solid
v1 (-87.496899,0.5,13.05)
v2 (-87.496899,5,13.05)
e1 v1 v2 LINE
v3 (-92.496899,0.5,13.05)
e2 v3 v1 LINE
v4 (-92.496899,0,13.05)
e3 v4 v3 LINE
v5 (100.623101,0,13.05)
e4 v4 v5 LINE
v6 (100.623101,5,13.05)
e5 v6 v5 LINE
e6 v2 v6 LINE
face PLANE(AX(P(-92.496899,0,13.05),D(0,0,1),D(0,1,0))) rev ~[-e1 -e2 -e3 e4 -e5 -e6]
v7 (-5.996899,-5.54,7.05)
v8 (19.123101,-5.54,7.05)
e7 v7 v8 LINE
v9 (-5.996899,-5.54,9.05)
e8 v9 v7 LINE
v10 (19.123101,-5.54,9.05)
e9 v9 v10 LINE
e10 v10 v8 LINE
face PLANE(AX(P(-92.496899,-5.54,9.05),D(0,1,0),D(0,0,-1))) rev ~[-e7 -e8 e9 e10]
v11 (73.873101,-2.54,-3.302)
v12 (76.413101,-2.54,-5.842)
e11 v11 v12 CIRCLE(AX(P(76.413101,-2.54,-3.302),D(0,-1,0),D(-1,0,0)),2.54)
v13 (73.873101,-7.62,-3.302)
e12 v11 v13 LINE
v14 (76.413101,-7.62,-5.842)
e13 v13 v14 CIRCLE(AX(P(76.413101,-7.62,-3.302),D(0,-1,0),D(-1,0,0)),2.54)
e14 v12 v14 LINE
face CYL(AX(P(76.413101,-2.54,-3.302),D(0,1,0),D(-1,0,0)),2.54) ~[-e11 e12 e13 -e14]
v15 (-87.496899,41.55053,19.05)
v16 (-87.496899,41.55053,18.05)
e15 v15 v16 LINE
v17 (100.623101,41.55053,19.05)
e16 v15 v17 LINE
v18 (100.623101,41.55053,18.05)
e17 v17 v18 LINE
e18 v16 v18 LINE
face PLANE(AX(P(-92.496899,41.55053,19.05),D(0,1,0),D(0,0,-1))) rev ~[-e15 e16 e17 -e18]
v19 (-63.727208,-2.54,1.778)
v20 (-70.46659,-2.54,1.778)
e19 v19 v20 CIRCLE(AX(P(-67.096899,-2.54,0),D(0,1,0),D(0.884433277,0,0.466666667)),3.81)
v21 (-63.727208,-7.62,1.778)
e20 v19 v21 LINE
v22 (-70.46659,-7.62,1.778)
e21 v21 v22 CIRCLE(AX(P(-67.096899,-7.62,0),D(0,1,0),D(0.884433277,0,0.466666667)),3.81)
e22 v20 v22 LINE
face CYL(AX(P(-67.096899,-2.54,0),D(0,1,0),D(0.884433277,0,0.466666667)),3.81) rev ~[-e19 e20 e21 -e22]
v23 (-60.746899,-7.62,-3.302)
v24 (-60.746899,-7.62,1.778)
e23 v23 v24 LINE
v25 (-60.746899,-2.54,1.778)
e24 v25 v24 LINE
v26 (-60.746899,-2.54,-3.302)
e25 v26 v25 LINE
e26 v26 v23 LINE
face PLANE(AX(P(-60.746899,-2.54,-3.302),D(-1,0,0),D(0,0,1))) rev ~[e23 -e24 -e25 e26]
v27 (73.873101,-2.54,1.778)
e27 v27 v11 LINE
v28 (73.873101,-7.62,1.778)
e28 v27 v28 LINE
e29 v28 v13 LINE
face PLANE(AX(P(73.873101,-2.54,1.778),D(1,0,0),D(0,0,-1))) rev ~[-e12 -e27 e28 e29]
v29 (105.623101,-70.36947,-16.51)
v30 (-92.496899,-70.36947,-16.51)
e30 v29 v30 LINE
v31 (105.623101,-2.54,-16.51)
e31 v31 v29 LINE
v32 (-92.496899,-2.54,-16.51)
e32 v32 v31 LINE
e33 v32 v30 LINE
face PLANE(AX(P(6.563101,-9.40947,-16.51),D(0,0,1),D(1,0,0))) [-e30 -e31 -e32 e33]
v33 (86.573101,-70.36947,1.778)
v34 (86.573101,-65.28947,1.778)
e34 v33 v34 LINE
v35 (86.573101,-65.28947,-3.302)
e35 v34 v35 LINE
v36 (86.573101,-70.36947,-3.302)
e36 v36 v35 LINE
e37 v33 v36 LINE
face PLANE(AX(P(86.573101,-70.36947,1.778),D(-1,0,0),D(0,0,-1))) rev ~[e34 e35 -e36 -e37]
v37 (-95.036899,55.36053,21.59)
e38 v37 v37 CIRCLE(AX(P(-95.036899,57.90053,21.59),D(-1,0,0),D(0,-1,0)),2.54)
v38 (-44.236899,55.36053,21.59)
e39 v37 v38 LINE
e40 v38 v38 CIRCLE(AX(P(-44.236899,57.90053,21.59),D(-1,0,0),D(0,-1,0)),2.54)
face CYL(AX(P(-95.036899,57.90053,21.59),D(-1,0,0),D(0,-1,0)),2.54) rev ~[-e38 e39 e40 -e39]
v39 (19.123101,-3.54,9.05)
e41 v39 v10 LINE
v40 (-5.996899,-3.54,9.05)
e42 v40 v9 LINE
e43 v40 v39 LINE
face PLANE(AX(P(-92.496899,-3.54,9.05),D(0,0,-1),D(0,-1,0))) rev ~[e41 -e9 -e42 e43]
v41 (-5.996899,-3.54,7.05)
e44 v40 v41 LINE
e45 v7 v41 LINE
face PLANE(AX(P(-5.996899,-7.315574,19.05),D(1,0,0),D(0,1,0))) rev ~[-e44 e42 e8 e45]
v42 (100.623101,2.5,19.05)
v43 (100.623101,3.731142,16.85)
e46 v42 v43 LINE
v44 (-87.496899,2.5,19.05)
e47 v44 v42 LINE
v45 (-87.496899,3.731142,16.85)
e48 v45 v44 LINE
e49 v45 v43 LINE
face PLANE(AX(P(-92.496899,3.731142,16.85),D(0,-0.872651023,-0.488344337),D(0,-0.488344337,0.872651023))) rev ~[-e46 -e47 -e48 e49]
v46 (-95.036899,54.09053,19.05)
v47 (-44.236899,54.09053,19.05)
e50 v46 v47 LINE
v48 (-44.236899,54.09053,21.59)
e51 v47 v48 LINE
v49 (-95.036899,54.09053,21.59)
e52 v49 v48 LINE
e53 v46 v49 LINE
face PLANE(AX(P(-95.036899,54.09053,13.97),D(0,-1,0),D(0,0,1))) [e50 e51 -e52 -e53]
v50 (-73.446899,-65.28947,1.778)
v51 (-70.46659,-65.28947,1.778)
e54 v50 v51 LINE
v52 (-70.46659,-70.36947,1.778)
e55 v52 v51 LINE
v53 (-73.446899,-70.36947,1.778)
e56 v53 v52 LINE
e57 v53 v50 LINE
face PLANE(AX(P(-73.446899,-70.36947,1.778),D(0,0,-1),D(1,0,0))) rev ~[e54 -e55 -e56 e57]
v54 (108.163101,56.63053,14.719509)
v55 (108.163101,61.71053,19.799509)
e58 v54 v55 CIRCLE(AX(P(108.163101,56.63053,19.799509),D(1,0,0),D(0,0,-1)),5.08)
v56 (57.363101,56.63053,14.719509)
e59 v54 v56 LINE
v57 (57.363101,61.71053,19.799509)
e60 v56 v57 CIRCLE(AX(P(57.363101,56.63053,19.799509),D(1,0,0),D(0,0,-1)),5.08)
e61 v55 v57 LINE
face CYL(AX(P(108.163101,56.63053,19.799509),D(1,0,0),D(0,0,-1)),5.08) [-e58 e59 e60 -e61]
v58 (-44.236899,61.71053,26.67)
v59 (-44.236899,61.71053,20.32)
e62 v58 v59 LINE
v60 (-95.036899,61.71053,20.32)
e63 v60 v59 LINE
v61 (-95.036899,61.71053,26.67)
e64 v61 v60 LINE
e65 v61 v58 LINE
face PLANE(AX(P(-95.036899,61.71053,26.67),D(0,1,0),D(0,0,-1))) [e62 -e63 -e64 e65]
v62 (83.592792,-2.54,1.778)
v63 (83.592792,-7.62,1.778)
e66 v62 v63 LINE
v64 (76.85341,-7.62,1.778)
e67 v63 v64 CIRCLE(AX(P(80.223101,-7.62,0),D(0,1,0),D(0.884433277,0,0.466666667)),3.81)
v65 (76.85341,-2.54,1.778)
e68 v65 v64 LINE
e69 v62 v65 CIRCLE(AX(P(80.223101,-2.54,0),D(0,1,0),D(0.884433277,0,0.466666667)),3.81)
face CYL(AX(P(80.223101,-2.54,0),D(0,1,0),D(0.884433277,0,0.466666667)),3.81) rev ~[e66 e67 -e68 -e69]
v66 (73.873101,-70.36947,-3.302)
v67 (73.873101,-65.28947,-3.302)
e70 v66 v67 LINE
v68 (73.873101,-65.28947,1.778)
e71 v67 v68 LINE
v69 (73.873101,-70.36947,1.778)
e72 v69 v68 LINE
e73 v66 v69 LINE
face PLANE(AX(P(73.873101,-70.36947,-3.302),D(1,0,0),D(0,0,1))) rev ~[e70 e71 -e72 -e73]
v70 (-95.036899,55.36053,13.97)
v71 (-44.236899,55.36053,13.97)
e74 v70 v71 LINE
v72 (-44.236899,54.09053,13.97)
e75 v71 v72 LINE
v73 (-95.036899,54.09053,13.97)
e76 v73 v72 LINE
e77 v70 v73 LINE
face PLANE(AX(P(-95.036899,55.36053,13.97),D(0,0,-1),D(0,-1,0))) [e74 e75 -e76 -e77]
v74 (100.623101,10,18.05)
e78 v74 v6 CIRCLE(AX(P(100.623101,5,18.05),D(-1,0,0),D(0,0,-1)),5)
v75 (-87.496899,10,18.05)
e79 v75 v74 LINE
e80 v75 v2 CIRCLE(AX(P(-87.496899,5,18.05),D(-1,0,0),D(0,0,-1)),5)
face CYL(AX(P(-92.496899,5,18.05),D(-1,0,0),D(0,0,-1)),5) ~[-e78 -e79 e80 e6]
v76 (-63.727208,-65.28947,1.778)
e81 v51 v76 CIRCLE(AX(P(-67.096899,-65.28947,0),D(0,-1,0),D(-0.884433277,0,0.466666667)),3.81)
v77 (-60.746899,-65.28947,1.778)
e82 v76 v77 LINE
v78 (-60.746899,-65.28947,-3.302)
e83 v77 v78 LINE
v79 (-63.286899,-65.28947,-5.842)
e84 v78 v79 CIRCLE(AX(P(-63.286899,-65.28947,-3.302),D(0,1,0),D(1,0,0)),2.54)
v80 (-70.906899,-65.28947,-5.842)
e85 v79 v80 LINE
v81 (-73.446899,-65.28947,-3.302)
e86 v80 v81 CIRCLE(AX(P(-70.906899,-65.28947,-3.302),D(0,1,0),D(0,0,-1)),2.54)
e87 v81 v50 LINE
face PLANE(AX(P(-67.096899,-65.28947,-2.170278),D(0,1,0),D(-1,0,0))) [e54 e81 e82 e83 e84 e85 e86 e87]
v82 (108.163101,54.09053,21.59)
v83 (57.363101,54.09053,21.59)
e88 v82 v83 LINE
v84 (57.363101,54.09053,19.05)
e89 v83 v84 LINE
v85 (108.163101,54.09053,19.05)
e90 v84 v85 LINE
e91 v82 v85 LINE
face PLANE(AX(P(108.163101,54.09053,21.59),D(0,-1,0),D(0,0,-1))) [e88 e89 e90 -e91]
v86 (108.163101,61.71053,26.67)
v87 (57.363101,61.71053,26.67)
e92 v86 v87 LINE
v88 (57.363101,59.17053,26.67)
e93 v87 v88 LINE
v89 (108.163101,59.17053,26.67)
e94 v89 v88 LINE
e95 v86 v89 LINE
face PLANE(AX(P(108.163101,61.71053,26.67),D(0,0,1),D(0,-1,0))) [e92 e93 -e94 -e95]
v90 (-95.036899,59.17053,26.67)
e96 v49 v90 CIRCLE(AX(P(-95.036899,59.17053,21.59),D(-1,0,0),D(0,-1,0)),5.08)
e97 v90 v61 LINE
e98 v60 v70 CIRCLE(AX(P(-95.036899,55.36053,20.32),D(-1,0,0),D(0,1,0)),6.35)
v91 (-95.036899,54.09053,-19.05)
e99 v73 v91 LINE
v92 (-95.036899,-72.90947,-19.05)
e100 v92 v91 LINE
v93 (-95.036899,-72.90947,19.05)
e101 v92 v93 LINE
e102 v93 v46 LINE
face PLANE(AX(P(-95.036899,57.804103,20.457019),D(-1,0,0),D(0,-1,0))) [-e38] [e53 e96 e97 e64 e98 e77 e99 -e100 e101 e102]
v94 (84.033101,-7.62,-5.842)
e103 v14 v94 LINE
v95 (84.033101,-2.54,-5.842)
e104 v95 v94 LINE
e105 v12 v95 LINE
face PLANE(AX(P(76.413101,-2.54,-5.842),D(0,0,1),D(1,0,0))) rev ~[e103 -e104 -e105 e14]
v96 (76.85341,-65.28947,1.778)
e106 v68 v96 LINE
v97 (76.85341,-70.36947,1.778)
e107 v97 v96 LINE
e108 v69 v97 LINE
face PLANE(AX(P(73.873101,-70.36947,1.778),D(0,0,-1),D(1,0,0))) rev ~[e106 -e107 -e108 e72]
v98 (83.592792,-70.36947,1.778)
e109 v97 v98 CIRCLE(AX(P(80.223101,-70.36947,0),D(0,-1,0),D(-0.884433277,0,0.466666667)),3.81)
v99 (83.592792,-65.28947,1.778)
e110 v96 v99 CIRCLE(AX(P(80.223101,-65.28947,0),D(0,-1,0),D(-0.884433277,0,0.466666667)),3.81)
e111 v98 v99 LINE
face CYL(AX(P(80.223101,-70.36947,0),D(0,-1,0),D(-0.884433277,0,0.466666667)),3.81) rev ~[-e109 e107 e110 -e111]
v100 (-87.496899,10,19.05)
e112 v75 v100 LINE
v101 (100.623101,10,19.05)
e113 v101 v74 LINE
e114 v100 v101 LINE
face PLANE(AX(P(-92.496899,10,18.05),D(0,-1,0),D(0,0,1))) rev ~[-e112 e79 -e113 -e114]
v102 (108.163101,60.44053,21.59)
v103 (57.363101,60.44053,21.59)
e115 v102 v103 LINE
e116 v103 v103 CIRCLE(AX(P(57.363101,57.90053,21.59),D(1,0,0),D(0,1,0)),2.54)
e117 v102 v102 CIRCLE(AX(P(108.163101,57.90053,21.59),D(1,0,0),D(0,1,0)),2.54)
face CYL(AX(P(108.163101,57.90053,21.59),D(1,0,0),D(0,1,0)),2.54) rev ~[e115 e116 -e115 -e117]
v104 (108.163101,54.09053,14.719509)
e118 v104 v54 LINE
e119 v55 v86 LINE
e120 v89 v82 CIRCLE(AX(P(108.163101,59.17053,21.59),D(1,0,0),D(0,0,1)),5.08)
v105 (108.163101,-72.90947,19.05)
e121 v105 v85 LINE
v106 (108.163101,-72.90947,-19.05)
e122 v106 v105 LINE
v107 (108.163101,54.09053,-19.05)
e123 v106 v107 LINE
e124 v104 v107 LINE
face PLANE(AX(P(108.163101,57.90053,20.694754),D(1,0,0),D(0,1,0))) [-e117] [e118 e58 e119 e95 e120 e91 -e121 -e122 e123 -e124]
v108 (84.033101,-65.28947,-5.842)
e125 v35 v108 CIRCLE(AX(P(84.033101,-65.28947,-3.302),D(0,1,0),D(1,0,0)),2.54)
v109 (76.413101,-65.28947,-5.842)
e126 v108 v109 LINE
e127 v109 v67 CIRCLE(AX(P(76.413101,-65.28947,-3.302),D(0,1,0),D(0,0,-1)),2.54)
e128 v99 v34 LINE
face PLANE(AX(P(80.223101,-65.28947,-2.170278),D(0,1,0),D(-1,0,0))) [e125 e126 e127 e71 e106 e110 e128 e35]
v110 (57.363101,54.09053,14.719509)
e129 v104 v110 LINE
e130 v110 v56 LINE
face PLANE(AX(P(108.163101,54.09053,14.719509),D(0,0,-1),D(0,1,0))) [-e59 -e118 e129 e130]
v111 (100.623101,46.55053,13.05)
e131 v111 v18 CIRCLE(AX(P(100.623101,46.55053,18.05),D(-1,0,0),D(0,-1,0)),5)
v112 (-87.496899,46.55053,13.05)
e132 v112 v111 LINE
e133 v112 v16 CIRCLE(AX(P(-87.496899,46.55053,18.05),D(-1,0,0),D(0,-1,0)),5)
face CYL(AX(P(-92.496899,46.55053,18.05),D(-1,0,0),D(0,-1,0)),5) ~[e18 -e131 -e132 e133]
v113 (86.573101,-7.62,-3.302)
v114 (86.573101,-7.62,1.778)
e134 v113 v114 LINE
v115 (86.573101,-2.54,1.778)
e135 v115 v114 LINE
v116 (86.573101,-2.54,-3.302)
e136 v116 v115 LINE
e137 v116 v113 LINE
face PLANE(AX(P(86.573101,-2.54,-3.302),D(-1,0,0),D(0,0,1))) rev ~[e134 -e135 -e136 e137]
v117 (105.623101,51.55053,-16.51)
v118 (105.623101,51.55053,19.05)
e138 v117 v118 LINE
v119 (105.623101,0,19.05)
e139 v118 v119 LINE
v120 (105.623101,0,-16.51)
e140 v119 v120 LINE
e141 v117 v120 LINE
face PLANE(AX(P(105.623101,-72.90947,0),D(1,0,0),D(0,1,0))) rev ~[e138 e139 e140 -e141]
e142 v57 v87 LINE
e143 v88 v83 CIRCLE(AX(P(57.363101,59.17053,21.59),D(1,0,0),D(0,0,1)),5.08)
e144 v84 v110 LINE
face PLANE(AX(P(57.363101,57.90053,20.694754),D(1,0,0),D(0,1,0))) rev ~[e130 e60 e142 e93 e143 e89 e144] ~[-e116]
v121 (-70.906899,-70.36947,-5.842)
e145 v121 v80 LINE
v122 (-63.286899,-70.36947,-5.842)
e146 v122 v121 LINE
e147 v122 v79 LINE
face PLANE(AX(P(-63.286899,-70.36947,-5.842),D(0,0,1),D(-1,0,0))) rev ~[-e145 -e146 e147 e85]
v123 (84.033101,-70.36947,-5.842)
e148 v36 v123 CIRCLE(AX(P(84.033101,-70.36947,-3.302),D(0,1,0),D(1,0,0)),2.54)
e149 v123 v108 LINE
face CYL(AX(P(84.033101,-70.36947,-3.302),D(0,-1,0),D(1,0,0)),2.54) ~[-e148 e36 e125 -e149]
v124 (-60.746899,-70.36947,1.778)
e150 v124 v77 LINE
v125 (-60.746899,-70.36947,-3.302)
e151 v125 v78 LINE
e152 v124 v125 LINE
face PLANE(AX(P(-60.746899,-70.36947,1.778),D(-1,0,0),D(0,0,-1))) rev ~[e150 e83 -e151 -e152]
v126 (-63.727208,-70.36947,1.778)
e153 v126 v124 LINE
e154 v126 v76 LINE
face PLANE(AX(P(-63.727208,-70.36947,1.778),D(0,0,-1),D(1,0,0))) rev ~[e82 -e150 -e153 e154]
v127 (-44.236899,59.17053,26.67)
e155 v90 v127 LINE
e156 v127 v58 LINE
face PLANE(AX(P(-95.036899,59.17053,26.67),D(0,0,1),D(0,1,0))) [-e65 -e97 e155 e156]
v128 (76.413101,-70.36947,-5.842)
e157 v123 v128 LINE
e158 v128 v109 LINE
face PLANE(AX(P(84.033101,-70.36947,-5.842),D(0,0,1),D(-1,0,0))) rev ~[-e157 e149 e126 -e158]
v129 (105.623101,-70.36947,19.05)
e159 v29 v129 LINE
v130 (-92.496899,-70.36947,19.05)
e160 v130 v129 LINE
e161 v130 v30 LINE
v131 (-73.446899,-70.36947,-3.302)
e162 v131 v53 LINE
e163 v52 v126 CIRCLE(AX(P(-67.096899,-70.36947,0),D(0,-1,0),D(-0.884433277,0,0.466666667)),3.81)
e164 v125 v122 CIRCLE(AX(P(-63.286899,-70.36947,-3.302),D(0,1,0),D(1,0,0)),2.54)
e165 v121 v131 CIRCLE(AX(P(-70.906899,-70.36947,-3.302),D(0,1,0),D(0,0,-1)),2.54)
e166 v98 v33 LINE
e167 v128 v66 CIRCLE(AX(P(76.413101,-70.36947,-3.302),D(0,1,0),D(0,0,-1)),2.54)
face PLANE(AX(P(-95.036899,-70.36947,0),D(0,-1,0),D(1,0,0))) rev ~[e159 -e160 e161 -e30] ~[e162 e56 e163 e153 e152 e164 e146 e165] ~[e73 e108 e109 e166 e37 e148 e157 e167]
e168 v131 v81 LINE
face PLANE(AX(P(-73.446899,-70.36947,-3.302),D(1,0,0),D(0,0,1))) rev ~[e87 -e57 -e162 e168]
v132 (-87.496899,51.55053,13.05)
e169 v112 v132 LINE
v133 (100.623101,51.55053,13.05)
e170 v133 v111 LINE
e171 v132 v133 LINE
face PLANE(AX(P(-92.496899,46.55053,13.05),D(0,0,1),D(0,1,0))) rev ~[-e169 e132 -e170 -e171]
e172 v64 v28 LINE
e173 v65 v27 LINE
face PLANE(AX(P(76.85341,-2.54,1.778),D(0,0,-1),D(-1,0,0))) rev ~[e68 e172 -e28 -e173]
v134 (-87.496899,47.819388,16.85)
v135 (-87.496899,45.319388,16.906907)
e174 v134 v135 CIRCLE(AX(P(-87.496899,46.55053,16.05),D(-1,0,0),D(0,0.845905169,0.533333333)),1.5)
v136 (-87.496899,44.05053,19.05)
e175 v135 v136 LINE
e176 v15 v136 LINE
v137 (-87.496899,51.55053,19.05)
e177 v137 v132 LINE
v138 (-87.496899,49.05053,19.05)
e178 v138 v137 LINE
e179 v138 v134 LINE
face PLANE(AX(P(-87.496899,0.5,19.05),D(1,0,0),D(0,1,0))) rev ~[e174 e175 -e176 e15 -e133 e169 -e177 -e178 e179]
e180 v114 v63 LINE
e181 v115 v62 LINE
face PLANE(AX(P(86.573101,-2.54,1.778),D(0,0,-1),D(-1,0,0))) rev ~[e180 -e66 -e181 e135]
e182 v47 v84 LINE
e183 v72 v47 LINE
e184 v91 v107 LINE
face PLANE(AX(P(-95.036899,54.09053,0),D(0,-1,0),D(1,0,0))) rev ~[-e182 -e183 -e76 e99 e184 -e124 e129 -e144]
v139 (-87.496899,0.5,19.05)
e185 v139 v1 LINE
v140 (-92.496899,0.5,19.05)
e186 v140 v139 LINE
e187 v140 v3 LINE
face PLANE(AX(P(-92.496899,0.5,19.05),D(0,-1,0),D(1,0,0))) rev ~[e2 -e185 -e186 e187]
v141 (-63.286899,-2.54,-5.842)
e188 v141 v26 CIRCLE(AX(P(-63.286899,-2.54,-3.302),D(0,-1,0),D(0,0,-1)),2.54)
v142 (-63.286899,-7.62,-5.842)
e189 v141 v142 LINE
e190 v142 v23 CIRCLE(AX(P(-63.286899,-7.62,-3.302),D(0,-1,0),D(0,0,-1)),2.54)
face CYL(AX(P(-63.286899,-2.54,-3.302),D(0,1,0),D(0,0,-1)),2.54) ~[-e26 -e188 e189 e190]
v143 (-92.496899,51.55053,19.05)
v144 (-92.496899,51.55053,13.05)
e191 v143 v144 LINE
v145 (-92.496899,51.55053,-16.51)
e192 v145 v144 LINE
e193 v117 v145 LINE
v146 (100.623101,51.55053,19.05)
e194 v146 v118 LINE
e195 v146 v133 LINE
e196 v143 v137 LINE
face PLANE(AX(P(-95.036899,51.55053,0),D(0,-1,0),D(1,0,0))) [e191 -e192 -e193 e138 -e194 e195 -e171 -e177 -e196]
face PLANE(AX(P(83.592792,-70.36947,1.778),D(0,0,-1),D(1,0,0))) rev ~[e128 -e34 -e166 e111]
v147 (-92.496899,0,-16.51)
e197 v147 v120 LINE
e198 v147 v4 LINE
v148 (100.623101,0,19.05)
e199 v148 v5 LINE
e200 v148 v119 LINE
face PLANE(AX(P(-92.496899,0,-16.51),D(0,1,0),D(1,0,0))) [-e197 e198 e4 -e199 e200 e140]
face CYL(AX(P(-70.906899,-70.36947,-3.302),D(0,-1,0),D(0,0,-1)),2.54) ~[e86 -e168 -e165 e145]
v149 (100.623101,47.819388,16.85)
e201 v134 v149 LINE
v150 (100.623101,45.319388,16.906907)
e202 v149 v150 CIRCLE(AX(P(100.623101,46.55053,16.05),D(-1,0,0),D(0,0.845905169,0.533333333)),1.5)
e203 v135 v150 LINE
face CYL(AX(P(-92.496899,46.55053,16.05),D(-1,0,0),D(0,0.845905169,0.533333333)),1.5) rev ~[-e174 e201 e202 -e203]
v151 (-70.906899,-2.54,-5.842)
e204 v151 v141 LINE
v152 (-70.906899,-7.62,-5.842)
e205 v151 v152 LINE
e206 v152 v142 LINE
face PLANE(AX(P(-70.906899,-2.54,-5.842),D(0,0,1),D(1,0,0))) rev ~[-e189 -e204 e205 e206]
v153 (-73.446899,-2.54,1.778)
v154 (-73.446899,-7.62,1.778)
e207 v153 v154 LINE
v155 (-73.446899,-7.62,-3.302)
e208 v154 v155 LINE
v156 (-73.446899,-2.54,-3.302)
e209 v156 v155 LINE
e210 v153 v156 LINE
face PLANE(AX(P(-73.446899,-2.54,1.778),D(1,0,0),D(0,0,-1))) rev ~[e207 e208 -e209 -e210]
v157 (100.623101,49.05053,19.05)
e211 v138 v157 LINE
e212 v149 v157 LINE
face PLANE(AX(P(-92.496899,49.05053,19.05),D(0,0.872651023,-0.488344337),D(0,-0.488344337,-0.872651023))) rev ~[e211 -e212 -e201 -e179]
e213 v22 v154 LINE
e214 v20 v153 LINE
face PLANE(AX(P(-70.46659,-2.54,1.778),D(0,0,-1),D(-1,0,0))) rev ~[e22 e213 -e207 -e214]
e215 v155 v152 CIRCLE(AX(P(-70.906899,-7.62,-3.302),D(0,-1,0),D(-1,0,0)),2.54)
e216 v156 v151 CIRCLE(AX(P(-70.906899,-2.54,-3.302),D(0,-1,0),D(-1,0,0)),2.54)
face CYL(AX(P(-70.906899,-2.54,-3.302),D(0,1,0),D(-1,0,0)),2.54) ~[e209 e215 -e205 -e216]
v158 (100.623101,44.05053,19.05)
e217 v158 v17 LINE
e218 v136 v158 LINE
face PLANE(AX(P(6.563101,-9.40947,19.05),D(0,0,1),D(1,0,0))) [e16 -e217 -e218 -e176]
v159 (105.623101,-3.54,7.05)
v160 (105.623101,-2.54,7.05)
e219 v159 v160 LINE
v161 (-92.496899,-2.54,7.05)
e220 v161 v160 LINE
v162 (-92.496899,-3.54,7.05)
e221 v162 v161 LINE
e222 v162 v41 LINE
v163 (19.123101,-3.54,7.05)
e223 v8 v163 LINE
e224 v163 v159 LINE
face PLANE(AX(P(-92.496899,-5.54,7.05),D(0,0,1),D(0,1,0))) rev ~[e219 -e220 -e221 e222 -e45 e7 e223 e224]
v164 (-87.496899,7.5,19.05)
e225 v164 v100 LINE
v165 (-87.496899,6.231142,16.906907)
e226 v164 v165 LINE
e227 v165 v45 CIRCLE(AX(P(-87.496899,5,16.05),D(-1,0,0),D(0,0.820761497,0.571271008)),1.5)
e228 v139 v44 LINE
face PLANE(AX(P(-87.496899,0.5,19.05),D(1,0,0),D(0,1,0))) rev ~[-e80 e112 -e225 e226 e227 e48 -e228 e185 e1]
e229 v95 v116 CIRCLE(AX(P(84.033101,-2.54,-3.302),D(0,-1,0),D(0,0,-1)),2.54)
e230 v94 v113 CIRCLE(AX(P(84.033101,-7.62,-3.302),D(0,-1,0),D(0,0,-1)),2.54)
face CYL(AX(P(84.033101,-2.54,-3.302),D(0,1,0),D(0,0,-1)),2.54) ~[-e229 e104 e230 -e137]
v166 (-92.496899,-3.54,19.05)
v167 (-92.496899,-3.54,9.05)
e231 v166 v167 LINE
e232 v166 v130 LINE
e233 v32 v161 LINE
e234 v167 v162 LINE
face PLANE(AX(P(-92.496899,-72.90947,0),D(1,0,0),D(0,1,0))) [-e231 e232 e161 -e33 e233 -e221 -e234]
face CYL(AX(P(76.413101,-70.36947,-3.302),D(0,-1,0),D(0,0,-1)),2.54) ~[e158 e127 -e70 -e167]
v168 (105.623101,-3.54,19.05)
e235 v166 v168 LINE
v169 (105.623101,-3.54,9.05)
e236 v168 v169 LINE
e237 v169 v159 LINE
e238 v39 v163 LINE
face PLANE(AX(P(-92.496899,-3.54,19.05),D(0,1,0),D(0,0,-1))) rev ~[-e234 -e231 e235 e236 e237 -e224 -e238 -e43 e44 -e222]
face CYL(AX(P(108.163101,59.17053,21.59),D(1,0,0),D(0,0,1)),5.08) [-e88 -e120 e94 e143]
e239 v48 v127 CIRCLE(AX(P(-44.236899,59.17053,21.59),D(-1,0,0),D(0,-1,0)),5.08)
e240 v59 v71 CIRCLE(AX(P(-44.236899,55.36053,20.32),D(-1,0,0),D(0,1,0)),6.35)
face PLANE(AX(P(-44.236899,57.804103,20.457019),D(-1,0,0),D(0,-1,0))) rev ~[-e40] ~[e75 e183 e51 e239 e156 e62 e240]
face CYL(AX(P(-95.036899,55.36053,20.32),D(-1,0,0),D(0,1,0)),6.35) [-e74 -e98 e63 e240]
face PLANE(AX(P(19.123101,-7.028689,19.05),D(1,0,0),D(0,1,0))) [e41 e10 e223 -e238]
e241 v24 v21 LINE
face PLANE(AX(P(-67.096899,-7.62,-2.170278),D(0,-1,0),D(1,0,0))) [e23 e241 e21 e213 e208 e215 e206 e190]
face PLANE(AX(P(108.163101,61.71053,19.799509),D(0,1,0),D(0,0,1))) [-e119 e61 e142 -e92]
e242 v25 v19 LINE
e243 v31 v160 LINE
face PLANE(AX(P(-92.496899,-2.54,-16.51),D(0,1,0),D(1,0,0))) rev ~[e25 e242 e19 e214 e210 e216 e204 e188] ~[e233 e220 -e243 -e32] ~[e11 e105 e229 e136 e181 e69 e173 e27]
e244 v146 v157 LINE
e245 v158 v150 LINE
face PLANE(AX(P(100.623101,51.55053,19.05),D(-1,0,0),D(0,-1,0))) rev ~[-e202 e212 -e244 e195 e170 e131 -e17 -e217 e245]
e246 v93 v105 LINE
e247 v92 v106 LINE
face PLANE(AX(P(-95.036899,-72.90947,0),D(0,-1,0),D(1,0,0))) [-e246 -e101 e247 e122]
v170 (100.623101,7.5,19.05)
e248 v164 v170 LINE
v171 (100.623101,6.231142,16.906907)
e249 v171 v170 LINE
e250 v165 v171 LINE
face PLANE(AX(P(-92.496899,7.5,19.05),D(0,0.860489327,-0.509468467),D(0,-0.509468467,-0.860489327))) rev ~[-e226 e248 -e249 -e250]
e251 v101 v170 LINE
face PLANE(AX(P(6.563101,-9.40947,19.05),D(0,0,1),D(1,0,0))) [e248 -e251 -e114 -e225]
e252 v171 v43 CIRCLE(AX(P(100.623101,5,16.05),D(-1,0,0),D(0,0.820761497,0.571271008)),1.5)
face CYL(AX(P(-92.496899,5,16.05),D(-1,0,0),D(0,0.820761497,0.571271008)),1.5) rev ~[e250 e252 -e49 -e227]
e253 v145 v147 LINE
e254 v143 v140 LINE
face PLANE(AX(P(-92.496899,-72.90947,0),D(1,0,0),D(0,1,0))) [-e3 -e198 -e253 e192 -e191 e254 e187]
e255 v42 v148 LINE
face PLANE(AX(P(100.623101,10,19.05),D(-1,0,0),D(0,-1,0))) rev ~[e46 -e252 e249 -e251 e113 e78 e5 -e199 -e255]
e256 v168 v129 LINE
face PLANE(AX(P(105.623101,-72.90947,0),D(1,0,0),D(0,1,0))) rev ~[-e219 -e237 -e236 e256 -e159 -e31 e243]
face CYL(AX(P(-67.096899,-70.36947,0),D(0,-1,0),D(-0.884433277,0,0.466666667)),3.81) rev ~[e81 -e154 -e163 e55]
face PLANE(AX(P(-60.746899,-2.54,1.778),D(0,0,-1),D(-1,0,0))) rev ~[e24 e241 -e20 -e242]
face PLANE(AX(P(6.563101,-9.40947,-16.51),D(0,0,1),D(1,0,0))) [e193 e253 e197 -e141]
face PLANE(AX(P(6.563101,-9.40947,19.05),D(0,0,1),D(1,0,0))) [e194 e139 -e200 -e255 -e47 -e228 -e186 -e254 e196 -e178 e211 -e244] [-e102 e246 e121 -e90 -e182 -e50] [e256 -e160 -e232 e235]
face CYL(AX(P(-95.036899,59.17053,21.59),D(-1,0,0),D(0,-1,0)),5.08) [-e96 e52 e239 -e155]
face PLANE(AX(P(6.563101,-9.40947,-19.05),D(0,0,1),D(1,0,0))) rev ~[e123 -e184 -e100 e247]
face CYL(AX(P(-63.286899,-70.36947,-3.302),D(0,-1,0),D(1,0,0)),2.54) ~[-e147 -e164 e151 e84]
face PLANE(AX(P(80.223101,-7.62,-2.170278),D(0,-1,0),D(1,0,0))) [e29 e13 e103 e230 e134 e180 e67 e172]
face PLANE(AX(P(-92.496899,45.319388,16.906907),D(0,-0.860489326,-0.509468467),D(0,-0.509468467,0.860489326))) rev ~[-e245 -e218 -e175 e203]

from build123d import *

# Parameters (mm, degrees)
F0_W      = 203.2
F0_H      = 127
F1_DEPTH  = 19.05
F2_T      = -2.54
F3_W      = 198.12
F3_H      = 2.54
F4_DEPTH  = 35.56
F6_DEPTH  = 5.08
F8_DEPTH  = 5.08
F9_R      = 2.54
F10_DEPTH = 50.8
F11_R     = 2.54
F12_DEPTH = 50.8
F14_DEPTH = 198.12
F15_W     = 5
F15_H     = 51.0505303715
F16_DEPTH = 10
F15_H_2   = 2.5
F15_H_3   = 5
F17_DEPTH = 25
F18_W     = 5
F18_H     = 2.5
F18_H_2   = 5
F19_DEPTH = 15
F21_DEPTH = 198.12
F22_W     = 86.5
F22_H     = 3.7755742139
F22_H_2   = 3.4886886767
F23_DEPTH = 15


with BuildPart() as f1:
    # F0 (on Top) → F1 (new body, symmetric)
    with BuildSketch(Plane.XY):
        with Locations((6.5631009638, -9.4094696285)):
            Rectangle(F0_W, F0_H)
    extrude(amount=F1_DEPTH, both=True)

    # F2
    f2_openings = [f1.faces().sort_by_distance(p)[0] for p in [
        (6.563101, -9.40947, 19.05),
    ]]
    offset(amount=F2_T, openings=f2_openings)

    # F3 (on face) → F4 (join, through all)
    with BuildSketch(Plane.XY.offset(-16.51)):
        with Locations((6.5631009638, -1.27)):
            Rectangle(F3_W, F3_H)
    extrude(amount=F4_DEPTH)

    # F5 (on face) → F6 (join)
    with BuildSketch(Plane.XZ.offset(2.54)):
        with BuildLine():
            ThreePointArc((-63.2868990362, -5.842), (-61.490847812, -5.0980512242), (-60.7468990362, -3.302))
            Line((-60.7468990362, -3.302), (-60.7468990362, 1.778))
            Line((-60.7468990362, 1.778), (-63.7272082492, 1.778))
            ThreePointArc((-63.7272082492, 1.778), (-67.0968990362, -3.81), (-70.4665898232, 1.778))
            Line((-70.4665898232, 1.778), (-73.4468990362, 1.778))
            Line((-73.4468990362, 1.778), (-73.4468990362, -3.302))
            ThreePointArc((-73.4468990362, -3.302), (-72.7029502604, -5.0980512242), (-70.9068990362, -5.842))
            Line((-70.9068990362, -5.842), (-63.2868990362, -5.842))
        make_face()
        with BuildLine():
            ThreePointArc((83.5927917508, 1.778), (80.2231009638, -3.81), (76.8534101768, 1.778))
            Line((76.8534101768, 1.778), (73.8731009638, 1.778))
            Line((73.8731009638, 1.778), (73.8731009638, -3.302))
            ThreePointArc((73.8731009638, -3.302), (74.6170497396, -5.0980512242), (76.4131009638, -5.842))
            Line((76.4131009638, -5.842), (84.0331009638, -5.842))
            ThreePointArc((84.0331009638, -5.842), (85.829152188, -5.0980512242), (86.5731009638, -3.302))
            Line((86.5731009638, -3.302), (86.5731009638, 1.778))
            Line((86.5731009638, 1.778), (83.5927917508, 1.778))
        make_face()
    extrude(amount=F6_DEPTH)

    # F7 (on face) → F8 (join)
    with BuildSketch(Plane(origin=(0, -70.3694696285, 0), x_dir=(-1, 0, 0), z_dir=(0, 1, 0))):
        with BuildLine():
            ThreePointArc((-76.8534101768, 1.778), (-80.2231009638, -3.81), (-83.5927917508, 1.778))
            Line((-83.5927917508, 1.778), (-86.5731009638, 1.778))
            Line((-86.5731009638, 1.778), (-86.5731009638, -3.302))
            ThreePointArc((-86.5731009638, -3.302), (-85.829152188, -5.0980512242), (-84.0331009638, -5.842))
            Line((-84.0331009638, -5.842), (-76.4131009638, -5.842))
            ThreePointArc((-76.4131009638, -5.842), (-74.6170497396, -5.0980512242), (-73.8731009638, -3.302))
            Line((-73.8731009638, -3.302), (-73.8731009638, 1.778))
            Line((-73.8731009638, 1.778), (-76.8534101768, 1.778))
        make_face()
        with BuildLine():
            ThreePointArc((60.7468990362, -3.302), (61.490847812, -5.0980512242), (63.2868990362, -5.842))
            Line((63.2868990362, -5.842), (70.9068990362, -5.842))
            ThreePointArc((70.9068990362, -5.842), (72.7029502604, -5.0980512242), (73.4468990362, -3.302))
            Line((73.4468990362, -3.302), (73.4468990362, 1.778))
            Line((73.4468990362, 1.778), (70.4665898232, 1.778))
            ThreePointArc((70.4665898232, 1.778), (67.0968990362, -3.81), (63.7272082492, 1.778))
            Line((63.7272082492, 1.778), (60.7468990362, 1.778))
            Line((60.7468990362, 1.778), (60.7468990362, -3.302))
        make_face()
    extrude(amount=F8_DEPTH)

    # F9 (on face) → F10 (join)
    with BuildSketch(Plane.YZ.offset(108.1631009638)):
        with BuildLine():
            Line((54.0905303715, 21.59), (54.0905303715, 14.7195085883))
            Line((54.0905303715, 14.7195085883), (56.6305303715, 14.7195085883))
            ThreePointArc((56.6305303715, 14.7195085883), (60.22263282, 16.2074061399), (61.7105303715, 19.7995085883))
            Line((61.7105303715, 19.7995085883), (61.7105303715, 26.67))
            Line((61.7105303715, 26.67), (59.1705303715, 26.67))
            ThreePointArc((59.1705303715, 26.67), (55.5784279231, 25.1821024484), (54.0905303715, 21.59))
        make_face()
        with Locations((57.9005303715, 21.59)):
            Circle(F9_R, mode=Mode.SUBTRACT)
    extrude(amount=-F10_DEPTH)

    # F11 (on face) → F12 (join)
    with BuildSketch(Plane(origin=(-95.0368990362, 0, 0), x_dir=(0, -1, 0), z_dir=(-1, 0, 0))):
        with BuildLine():
            Line((-55.3605303715, 13.97), (-54.0905303715, 13.97))
            Line((-54.0905303715, 13.97), (-54.0905303715, 19.05))
            Line((-54.0905303715, 19.05), (-54.0905303715, 21.59))
            ThreePointArc((-54.0905303715, 21.59), (-55.5784279231, 25.1821024484), (-59.1705303715, 26.67))
            Line((-59.1705303715, 26.67), (-61.7105303715, 26.67))
            Line((-61.7105303715, 26.67), (-61.7105303715, 20.32))
            ThreePointArc((-61.7105303715, 20.32), (-59.8506584321, 15.8298719395), (-55.3605303715, 13.97))
        make_face()
        with Locations((-57.9005303715, 21.59)):
            Circle(F11_R, mode=Mode.SUBTRACT)
    extrude(amount=-F12_DEPTH)

    # F13 (on face) → F14 (join, through all)
    with BuildSketch(Plane.YZ.offset(-92.4968990362)):
        with BuildLine():
            Line((46.5505303715, 13.05), (51.5505303715, 13.05))
            Line((51.5505303715, 13.05), (51.5505303715, 19.05))
            Line((51.5505303715, 19.05), (49.0505303715, 19.05))
            Line((49.0505303715, 19.05), (47.8193881256, 16.85))
            ThreePointArc((47.8193881256, 16.85), (46.5163953065, 14.5503884512), (45.3193881256, 16.906906512))
            Line((45.3193881256, 16.906906512), (44.0505303715, 19.05))
            Line((44.0505303715, 19.05), (41.5505303715, 19.05))
            Line((41.5505303715, 19.05), (41.5505303715, 18.05))
            ThreePointArc((41.5505303715, 18.05), (43.0149964656, 14.5144660941), (46.5505303715, 13.05))
        make_face()
        with BuildLine():
            Line((0, 19.05), (0, 13.05))
            Line((0, 13.05), (5, 13.05))
            ThreePointArc((5, 13.05), (8.5355339059, 14.5144660941), (10, 18.05))
            Line((10, 18.05), (10, 19.05))
            Line((10, 19.05), (7.5, 19.05))
            Line((7.5, 19.05), (6.231142246, 16.906906512))
            ThreePointArc((6.231142246, 16.906906512), (5.034135065, 14.5503884512), (3.731142246, 16.85))
            Line((3.731142246, 16.85), (2.5, 19.05))
            Line((2.5, 19.05), (0, 19.05))
        make_face()
    extrude(amount=F14_DEPTH)

    # F15 (on face) → F16 (cut)
    with BuildSketch(Plane.XY.offset(19.05)):
        with Locations((-89.9968990362, 26.0252651858)):
            Rectangle(F15_W, F15_H)
    extrude(amount=-F16_DEPTH, mode=Mode.SUBTRACT)

    # F15 (on face) → F17 (cut)
    with BuildSketch(Plane.XY.offset(19.05)):
        with Locations((-89.9968990362, 50.3005303715)):
            Rectangle(F15_W, F15_H_2)
        with Locations((-89.9968990362, 46.5505303715)):
            Rectangle(F15_W, F15_H_3)
        with Locations((-89.9968990362, 42.8005303715)):
            Rectangle(F15_W, F15_H_2)
    extrude(amount=-F17_DEPTH, mode=Mode.SUBTRACT)

    # F18 (on face) → F19 (cut)
    with BuildSketch(Plane.XY.offset(19.05)):
        with Locations((103.1231009638, 50.3005303715)):
            Rectangle(F18_W, F18_H)
        with Locations((103.1231009638, 46.5505303715)):
            Rectangle(F18_W, F18_H_2)
        with Locations((103.1231009638, 42.8005303715)):
            Rectangle(F18_W, F18_H)
        with Locations((103.1231009638, 8.75)):
            Rectangle(F18_W, F18_H)
        with Locations((103.1231009638, 5)):
            Rectangle(F18_W, F18_H_2)
        with Locations((103.1231009638, 1.25)):
            Rectangle(F18_W, F18_H)
    extrude(amount=-F19_DEPTH, mode=Mode.SUBTRACT)

    # F20 (on face) → F21 (join, through all)
    with BuildSketch(Plane.YZ.offset(-92.4968990362)):
        Polygon((-5.54, 7.05), (-2.54, 7.05), (-2.54, 19.05), (-3.54, 19.05), (-3.54, 9.05), (-5.54, 9.05), align=None)
    extrude(amount=F21_DEPTH)

    # F22 (on face) → F23 (cut)
    with BuildSketch(Plane.XY.offset(19.05)):
        with Locations((-49.2468990362, -5.4277871069)):
            Rectangle(F22_W, F22_H)
        with Locations((62.3731009638, -5.2843443383)):
            Rectangle(F22_W, F22_H_2)
    extrude(amount=-F23_DEPTH, mode=Mode.SUBTRACT)


solid = f1.part
